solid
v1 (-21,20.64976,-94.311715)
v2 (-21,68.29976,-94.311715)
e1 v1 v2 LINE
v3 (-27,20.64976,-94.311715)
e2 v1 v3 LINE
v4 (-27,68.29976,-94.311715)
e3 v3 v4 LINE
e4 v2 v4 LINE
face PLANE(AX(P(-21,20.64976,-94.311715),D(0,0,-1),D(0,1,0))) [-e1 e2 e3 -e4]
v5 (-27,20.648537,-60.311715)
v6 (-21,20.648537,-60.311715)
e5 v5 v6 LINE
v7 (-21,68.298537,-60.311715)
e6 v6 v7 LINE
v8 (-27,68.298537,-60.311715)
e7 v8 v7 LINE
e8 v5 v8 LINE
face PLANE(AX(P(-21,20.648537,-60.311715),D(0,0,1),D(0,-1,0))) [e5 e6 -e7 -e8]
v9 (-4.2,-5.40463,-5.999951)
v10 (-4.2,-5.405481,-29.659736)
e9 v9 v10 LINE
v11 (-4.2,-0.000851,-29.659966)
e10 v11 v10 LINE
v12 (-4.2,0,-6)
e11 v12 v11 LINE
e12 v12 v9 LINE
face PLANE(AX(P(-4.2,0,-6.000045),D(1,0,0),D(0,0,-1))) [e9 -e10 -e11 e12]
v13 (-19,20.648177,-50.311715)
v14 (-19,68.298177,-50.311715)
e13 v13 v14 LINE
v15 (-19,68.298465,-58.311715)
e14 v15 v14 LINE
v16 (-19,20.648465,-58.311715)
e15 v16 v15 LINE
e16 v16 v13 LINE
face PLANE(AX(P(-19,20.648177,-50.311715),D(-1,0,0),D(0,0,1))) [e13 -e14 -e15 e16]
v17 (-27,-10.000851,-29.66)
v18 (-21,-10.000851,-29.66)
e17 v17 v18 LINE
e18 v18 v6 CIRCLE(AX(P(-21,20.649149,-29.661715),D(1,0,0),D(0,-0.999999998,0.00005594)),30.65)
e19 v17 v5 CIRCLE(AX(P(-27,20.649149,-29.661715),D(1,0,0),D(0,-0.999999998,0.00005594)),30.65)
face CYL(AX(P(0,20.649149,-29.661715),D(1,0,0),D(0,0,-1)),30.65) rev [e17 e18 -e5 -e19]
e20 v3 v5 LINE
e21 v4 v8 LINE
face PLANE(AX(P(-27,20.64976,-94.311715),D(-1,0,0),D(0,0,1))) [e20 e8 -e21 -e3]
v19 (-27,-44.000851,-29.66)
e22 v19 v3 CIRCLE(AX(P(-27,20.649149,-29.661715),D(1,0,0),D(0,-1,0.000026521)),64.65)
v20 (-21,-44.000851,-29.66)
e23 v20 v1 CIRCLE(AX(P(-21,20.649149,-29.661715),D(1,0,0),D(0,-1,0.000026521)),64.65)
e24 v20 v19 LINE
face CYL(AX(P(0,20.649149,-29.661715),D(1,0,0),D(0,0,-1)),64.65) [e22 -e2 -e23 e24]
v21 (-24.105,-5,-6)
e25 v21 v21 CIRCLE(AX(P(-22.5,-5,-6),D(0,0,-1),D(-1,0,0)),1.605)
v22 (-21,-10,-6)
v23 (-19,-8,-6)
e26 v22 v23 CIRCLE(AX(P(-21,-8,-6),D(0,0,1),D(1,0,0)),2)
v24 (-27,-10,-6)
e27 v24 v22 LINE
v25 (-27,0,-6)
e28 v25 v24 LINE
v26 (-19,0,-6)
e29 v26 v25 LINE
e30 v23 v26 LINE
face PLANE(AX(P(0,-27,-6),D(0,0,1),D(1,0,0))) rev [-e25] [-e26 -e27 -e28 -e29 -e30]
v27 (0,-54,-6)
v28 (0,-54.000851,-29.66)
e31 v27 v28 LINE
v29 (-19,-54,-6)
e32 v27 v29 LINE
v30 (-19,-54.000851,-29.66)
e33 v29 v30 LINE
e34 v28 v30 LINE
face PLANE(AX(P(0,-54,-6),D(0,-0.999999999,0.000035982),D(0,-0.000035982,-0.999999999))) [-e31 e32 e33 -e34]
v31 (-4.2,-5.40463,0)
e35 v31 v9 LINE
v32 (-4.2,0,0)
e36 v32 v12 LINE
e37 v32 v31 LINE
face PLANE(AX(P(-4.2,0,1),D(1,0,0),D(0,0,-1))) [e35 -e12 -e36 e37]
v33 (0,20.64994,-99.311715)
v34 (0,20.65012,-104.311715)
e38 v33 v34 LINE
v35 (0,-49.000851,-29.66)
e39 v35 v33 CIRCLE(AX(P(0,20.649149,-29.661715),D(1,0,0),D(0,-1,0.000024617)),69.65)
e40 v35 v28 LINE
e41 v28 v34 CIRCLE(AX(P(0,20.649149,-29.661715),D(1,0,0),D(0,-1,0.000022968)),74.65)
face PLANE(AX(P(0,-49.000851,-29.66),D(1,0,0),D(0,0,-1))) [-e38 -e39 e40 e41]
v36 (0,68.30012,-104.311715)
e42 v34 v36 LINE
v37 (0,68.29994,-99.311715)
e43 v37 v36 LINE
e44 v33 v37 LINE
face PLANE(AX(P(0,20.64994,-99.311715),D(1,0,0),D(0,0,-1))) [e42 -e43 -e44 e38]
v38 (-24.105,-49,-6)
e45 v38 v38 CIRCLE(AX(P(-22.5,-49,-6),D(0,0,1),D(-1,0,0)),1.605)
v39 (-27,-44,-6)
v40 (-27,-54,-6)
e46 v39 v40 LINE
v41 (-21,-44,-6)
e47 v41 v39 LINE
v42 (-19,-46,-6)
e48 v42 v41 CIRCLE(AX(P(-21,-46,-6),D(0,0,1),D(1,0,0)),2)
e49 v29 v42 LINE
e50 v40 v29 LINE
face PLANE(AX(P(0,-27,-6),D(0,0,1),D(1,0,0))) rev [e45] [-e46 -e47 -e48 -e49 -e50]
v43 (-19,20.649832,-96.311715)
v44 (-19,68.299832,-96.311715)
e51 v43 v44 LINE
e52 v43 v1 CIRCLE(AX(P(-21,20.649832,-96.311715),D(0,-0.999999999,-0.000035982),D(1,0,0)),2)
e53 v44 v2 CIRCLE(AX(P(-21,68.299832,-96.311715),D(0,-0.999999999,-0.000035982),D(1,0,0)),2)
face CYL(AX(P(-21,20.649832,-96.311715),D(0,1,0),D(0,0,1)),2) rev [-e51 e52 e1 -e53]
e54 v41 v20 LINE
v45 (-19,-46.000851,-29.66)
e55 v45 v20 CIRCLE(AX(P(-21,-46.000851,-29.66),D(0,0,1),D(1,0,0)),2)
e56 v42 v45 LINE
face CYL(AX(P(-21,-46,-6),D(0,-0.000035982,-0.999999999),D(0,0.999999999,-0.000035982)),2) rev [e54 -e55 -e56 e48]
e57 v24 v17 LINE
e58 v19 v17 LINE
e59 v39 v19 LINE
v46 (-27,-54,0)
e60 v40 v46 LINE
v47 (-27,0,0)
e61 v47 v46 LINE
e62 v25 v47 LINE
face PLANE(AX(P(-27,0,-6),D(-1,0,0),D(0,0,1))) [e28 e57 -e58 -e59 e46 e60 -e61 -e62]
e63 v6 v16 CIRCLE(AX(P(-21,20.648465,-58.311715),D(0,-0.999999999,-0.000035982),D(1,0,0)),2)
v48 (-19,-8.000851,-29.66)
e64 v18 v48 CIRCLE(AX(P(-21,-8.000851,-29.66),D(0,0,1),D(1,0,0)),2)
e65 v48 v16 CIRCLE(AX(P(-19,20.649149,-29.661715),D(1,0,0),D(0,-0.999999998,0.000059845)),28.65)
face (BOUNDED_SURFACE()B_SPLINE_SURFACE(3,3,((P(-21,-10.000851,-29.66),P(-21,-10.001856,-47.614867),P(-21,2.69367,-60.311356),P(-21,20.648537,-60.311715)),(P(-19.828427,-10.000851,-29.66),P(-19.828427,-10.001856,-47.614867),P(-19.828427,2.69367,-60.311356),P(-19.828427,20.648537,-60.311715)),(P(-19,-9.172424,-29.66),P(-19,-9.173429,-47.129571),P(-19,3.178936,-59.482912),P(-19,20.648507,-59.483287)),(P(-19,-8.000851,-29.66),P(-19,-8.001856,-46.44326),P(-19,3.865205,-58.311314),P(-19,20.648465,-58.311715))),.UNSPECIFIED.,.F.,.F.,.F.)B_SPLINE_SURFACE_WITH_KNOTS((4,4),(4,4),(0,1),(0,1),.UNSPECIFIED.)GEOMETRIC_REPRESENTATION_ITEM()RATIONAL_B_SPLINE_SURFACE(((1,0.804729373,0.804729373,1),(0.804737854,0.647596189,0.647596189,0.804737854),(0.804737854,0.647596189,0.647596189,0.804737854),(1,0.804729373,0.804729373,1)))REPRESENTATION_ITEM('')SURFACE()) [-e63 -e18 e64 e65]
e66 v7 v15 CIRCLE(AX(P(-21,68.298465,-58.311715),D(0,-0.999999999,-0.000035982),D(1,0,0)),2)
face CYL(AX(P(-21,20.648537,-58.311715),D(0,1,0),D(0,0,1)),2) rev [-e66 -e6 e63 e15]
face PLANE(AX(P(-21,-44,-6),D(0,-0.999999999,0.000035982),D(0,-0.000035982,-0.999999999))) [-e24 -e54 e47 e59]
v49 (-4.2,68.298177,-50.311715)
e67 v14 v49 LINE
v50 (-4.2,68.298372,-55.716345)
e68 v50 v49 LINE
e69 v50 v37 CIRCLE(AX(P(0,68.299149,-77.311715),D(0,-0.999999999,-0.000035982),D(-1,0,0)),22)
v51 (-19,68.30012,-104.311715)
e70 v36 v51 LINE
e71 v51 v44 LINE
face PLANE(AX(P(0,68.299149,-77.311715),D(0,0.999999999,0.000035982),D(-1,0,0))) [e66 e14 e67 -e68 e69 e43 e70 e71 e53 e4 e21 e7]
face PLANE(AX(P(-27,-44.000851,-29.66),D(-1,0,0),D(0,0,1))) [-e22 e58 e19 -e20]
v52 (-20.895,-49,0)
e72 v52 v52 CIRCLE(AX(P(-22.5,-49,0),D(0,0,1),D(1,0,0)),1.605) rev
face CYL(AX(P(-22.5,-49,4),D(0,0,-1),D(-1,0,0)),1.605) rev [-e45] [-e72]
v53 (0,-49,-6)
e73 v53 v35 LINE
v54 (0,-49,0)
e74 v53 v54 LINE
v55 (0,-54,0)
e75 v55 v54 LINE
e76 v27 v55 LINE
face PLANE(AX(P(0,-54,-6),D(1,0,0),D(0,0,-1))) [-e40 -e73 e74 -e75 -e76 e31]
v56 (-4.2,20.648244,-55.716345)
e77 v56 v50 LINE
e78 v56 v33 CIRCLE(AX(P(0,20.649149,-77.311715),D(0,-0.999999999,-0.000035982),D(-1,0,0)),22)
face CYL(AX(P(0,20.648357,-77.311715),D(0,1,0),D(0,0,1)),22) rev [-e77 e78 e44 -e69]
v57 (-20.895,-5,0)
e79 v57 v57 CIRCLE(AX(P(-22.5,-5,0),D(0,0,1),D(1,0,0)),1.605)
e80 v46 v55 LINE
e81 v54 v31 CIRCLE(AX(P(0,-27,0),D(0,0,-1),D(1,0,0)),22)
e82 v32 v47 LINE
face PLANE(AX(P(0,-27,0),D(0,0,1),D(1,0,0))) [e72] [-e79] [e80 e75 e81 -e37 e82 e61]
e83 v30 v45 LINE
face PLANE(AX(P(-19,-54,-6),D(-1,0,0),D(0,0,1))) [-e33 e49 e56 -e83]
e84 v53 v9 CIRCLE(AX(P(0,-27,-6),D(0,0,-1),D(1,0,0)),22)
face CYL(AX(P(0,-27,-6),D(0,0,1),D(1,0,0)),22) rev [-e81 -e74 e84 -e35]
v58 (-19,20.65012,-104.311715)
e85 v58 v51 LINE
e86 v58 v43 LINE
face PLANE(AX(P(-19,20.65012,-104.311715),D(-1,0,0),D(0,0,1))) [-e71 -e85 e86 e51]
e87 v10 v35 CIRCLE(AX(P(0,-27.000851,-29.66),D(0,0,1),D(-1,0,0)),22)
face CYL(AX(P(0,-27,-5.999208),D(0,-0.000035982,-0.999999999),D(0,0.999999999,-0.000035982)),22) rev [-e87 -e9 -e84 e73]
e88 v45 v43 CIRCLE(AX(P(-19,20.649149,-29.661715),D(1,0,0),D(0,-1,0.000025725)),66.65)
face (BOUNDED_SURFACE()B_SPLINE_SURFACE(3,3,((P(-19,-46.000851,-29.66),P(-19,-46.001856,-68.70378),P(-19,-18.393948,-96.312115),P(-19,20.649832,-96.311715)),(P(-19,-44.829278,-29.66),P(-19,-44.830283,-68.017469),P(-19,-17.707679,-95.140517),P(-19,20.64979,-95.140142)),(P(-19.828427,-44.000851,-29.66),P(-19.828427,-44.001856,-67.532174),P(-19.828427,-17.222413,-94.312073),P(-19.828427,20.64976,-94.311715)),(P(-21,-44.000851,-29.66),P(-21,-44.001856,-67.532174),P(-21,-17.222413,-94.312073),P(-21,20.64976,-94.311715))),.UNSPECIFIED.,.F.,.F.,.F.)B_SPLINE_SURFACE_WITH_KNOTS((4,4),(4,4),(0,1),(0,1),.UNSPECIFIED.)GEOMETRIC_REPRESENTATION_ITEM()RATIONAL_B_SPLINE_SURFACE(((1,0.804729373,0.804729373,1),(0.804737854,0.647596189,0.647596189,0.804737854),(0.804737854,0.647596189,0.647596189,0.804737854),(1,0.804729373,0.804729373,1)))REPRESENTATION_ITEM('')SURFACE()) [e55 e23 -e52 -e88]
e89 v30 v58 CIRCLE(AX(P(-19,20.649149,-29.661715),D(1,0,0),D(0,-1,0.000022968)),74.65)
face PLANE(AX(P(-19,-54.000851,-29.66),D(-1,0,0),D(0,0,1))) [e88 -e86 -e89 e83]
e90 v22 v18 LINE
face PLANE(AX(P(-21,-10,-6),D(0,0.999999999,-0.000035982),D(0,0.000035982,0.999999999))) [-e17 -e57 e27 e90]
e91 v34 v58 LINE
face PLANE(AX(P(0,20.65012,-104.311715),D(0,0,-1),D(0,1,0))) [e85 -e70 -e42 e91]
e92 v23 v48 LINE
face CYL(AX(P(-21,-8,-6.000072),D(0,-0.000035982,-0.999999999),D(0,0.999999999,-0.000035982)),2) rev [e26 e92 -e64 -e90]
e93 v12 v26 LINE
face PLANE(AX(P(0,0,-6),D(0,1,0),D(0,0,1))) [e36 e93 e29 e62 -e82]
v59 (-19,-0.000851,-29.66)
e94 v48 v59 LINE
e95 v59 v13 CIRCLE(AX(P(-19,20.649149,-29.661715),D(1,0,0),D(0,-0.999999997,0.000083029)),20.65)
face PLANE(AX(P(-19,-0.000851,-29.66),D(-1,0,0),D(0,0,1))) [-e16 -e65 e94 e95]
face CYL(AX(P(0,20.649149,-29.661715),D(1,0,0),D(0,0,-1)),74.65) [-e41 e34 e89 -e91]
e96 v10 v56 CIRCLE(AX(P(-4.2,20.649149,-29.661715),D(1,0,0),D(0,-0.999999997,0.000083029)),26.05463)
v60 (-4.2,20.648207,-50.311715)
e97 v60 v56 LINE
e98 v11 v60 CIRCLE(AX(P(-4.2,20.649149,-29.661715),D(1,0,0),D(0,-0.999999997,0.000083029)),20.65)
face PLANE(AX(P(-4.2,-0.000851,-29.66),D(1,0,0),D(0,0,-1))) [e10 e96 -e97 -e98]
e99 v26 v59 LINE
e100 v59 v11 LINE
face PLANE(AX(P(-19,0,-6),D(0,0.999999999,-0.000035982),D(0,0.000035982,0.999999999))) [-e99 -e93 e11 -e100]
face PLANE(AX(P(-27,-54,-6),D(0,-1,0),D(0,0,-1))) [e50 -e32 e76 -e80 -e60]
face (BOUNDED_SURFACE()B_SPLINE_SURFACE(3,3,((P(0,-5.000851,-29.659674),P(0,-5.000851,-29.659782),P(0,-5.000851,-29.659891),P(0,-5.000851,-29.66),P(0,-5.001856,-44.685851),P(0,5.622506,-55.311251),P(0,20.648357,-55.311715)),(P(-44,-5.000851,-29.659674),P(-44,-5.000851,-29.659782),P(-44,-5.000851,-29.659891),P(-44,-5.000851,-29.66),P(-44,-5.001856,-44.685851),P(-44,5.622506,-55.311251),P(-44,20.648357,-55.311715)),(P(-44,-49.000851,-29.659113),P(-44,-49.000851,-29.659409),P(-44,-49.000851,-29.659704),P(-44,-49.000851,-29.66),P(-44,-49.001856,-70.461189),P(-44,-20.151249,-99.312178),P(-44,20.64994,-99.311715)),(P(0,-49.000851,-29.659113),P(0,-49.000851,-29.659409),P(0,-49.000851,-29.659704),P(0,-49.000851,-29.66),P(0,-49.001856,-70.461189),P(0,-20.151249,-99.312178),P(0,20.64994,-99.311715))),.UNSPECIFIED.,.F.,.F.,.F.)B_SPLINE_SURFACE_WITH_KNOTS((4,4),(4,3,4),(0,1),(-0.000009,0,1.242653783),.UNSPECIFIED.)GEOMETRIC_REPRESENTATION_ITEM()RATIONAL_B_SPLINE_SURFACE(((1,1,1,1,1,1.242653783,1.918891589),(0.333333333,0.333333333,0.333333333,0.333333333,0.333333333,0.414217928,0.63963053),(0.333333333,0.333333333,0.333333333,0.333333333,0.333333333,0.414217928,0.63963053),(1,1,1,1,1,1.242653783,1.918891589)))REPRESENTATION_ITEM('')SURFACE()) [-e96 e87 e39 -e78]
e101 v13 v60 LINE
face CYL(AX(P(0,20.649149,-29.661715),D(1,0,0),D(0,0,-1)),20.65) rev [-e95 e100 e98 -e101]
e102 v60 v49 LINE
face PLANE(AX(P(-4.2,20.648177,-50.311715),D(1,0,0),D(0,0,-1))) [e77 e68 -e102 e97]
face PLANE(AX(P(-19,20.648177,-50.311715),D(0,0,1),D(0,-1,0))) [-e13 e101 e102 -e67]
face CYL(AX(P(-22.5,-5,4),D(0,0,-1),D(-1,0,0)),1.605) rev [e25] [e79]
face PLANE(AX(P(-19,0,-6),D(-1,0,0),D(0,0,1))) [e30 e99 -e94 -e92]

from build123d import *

# Parameters (mm, degrees)
EXTRUDE_1_DEPTH     = 6
SKETCH_4_R          = 1.605
CUT_EXTRUDE_1_DEPTH = 10
SWEEP_START         = -4.2
SWEEP_1_2_DEPTH     = 4.2


# Read off the part's stored shape, not the designer's step: 切除-扫描1
with BuildPart() as part:
    # 草图1 → 凸台-拉伸1 (new body)
    with BuildSketch(Plane.XY):
        with BuildLine():
            Line((0, 0), (-27, 0))
            Line((-27, 0), (-27, -54))
            Line((-27, -54), (0, -54))
            Line((0, -54), (0, -49))
            ThreePointArc((0, -49), (-22, -27), (0, -5))
            Line((0, -5), (0, 0))
        make_face()
    extrude(amount=-EXTRUDE_1_DEPTH)

    # Sweep 1: sweep along a path in 草图3
    with BuildLine(Plane(origin=(0, 0, 0), x_dir=(0, 0, -1), z_dir=(1, 0, 0))) as sweep_1_path:
        Line((6, -27), (29.659999985, -27.000851338))
        ThreePointArc((29.659999985, -27.000851338), (63.354746468, -13.045095672), (77.311714535, 20.649148631))
        Line((77.311714535, 20.649148631), (77.311714535, 68.299148631))
    # 草图2 → Sweep 1 (sweep)
    with BuildSketch(Plane(origin=(0, 0, -6), x_dir=(-1, 0, 0), z_dir=(0, 0, -1))):
        with BuildLine():
            Line((19, 0), (19, -8))
            ThreePointArc((19, -8), (19.585786438, -9.414213562), (21, -10))
            Line((21, -10), (27, -10))
            Line((27, -10), (27, -44))
            Line((27, -44), (21, -44))
            ThreePointArc((21, -44), (19.585786438, -44.585786438), (19, -46))
            Line((19, -46), (19, -54))
            Line((19, -54), (0, -54))
            Line((0, -54), (0, -49))
            ThreePointArc((0, -49), (22, -27), (0, -5))
            Line((0, -5), (0, 0))
            Line((0, 0), (19, 0))
        make_face()
    sweep(path=sweep_1_path.line)

    # 草图4 → 切除-拉伸1 (cut)
    with BuildSketch(Plane(origin=(0, 0, -6), x_dir=(-1, 0, 0), z_dir=(0, 0, -1))):
        with Locations((22.5, -5)):
            Circle(SKETCH_4_R)
    cut_extrude_1 = extrude(amount=-CUT_EXTRUDE_1_DEPTH, mode=Mode.SUBTRACT)

    # 镜向1: 切除-拉伸1 across plane
    add(cut_extrude_1.mirror(Plane.ZX.offset(-27)), mode=Mode.SUBTRACT)

    # Sweep 1 2 outline → Sweep 1 2 (cut)
    with BuildSketch(Plane.YZ.offset(SWEEP_START)):
        with BuildLine():
            Line((-0.000851338, -29.659999985), (0, -6))
            Line((0, -6), (0, 1))
            Line((0, 1), (-7, 1))
            Line((-7, 1), (-7, -57))
            Line((-7, -57), (68.298417771, -57))
            Line((68.298417771, -57), (68.298177112, -50.311714553))
            Line((68.298177112, -50.311714553), (20.648177112, -50.311714553))
            ThreePointArc((20.648177112, -50.311714553), (6.046443933, -44.262519896), (-0.000851338, -29.659999985))
        make_face()
    extrude(amount=SWEEP_1_2_DEPTH, mode=Mode.SUBTRACT)


solid = part.part
